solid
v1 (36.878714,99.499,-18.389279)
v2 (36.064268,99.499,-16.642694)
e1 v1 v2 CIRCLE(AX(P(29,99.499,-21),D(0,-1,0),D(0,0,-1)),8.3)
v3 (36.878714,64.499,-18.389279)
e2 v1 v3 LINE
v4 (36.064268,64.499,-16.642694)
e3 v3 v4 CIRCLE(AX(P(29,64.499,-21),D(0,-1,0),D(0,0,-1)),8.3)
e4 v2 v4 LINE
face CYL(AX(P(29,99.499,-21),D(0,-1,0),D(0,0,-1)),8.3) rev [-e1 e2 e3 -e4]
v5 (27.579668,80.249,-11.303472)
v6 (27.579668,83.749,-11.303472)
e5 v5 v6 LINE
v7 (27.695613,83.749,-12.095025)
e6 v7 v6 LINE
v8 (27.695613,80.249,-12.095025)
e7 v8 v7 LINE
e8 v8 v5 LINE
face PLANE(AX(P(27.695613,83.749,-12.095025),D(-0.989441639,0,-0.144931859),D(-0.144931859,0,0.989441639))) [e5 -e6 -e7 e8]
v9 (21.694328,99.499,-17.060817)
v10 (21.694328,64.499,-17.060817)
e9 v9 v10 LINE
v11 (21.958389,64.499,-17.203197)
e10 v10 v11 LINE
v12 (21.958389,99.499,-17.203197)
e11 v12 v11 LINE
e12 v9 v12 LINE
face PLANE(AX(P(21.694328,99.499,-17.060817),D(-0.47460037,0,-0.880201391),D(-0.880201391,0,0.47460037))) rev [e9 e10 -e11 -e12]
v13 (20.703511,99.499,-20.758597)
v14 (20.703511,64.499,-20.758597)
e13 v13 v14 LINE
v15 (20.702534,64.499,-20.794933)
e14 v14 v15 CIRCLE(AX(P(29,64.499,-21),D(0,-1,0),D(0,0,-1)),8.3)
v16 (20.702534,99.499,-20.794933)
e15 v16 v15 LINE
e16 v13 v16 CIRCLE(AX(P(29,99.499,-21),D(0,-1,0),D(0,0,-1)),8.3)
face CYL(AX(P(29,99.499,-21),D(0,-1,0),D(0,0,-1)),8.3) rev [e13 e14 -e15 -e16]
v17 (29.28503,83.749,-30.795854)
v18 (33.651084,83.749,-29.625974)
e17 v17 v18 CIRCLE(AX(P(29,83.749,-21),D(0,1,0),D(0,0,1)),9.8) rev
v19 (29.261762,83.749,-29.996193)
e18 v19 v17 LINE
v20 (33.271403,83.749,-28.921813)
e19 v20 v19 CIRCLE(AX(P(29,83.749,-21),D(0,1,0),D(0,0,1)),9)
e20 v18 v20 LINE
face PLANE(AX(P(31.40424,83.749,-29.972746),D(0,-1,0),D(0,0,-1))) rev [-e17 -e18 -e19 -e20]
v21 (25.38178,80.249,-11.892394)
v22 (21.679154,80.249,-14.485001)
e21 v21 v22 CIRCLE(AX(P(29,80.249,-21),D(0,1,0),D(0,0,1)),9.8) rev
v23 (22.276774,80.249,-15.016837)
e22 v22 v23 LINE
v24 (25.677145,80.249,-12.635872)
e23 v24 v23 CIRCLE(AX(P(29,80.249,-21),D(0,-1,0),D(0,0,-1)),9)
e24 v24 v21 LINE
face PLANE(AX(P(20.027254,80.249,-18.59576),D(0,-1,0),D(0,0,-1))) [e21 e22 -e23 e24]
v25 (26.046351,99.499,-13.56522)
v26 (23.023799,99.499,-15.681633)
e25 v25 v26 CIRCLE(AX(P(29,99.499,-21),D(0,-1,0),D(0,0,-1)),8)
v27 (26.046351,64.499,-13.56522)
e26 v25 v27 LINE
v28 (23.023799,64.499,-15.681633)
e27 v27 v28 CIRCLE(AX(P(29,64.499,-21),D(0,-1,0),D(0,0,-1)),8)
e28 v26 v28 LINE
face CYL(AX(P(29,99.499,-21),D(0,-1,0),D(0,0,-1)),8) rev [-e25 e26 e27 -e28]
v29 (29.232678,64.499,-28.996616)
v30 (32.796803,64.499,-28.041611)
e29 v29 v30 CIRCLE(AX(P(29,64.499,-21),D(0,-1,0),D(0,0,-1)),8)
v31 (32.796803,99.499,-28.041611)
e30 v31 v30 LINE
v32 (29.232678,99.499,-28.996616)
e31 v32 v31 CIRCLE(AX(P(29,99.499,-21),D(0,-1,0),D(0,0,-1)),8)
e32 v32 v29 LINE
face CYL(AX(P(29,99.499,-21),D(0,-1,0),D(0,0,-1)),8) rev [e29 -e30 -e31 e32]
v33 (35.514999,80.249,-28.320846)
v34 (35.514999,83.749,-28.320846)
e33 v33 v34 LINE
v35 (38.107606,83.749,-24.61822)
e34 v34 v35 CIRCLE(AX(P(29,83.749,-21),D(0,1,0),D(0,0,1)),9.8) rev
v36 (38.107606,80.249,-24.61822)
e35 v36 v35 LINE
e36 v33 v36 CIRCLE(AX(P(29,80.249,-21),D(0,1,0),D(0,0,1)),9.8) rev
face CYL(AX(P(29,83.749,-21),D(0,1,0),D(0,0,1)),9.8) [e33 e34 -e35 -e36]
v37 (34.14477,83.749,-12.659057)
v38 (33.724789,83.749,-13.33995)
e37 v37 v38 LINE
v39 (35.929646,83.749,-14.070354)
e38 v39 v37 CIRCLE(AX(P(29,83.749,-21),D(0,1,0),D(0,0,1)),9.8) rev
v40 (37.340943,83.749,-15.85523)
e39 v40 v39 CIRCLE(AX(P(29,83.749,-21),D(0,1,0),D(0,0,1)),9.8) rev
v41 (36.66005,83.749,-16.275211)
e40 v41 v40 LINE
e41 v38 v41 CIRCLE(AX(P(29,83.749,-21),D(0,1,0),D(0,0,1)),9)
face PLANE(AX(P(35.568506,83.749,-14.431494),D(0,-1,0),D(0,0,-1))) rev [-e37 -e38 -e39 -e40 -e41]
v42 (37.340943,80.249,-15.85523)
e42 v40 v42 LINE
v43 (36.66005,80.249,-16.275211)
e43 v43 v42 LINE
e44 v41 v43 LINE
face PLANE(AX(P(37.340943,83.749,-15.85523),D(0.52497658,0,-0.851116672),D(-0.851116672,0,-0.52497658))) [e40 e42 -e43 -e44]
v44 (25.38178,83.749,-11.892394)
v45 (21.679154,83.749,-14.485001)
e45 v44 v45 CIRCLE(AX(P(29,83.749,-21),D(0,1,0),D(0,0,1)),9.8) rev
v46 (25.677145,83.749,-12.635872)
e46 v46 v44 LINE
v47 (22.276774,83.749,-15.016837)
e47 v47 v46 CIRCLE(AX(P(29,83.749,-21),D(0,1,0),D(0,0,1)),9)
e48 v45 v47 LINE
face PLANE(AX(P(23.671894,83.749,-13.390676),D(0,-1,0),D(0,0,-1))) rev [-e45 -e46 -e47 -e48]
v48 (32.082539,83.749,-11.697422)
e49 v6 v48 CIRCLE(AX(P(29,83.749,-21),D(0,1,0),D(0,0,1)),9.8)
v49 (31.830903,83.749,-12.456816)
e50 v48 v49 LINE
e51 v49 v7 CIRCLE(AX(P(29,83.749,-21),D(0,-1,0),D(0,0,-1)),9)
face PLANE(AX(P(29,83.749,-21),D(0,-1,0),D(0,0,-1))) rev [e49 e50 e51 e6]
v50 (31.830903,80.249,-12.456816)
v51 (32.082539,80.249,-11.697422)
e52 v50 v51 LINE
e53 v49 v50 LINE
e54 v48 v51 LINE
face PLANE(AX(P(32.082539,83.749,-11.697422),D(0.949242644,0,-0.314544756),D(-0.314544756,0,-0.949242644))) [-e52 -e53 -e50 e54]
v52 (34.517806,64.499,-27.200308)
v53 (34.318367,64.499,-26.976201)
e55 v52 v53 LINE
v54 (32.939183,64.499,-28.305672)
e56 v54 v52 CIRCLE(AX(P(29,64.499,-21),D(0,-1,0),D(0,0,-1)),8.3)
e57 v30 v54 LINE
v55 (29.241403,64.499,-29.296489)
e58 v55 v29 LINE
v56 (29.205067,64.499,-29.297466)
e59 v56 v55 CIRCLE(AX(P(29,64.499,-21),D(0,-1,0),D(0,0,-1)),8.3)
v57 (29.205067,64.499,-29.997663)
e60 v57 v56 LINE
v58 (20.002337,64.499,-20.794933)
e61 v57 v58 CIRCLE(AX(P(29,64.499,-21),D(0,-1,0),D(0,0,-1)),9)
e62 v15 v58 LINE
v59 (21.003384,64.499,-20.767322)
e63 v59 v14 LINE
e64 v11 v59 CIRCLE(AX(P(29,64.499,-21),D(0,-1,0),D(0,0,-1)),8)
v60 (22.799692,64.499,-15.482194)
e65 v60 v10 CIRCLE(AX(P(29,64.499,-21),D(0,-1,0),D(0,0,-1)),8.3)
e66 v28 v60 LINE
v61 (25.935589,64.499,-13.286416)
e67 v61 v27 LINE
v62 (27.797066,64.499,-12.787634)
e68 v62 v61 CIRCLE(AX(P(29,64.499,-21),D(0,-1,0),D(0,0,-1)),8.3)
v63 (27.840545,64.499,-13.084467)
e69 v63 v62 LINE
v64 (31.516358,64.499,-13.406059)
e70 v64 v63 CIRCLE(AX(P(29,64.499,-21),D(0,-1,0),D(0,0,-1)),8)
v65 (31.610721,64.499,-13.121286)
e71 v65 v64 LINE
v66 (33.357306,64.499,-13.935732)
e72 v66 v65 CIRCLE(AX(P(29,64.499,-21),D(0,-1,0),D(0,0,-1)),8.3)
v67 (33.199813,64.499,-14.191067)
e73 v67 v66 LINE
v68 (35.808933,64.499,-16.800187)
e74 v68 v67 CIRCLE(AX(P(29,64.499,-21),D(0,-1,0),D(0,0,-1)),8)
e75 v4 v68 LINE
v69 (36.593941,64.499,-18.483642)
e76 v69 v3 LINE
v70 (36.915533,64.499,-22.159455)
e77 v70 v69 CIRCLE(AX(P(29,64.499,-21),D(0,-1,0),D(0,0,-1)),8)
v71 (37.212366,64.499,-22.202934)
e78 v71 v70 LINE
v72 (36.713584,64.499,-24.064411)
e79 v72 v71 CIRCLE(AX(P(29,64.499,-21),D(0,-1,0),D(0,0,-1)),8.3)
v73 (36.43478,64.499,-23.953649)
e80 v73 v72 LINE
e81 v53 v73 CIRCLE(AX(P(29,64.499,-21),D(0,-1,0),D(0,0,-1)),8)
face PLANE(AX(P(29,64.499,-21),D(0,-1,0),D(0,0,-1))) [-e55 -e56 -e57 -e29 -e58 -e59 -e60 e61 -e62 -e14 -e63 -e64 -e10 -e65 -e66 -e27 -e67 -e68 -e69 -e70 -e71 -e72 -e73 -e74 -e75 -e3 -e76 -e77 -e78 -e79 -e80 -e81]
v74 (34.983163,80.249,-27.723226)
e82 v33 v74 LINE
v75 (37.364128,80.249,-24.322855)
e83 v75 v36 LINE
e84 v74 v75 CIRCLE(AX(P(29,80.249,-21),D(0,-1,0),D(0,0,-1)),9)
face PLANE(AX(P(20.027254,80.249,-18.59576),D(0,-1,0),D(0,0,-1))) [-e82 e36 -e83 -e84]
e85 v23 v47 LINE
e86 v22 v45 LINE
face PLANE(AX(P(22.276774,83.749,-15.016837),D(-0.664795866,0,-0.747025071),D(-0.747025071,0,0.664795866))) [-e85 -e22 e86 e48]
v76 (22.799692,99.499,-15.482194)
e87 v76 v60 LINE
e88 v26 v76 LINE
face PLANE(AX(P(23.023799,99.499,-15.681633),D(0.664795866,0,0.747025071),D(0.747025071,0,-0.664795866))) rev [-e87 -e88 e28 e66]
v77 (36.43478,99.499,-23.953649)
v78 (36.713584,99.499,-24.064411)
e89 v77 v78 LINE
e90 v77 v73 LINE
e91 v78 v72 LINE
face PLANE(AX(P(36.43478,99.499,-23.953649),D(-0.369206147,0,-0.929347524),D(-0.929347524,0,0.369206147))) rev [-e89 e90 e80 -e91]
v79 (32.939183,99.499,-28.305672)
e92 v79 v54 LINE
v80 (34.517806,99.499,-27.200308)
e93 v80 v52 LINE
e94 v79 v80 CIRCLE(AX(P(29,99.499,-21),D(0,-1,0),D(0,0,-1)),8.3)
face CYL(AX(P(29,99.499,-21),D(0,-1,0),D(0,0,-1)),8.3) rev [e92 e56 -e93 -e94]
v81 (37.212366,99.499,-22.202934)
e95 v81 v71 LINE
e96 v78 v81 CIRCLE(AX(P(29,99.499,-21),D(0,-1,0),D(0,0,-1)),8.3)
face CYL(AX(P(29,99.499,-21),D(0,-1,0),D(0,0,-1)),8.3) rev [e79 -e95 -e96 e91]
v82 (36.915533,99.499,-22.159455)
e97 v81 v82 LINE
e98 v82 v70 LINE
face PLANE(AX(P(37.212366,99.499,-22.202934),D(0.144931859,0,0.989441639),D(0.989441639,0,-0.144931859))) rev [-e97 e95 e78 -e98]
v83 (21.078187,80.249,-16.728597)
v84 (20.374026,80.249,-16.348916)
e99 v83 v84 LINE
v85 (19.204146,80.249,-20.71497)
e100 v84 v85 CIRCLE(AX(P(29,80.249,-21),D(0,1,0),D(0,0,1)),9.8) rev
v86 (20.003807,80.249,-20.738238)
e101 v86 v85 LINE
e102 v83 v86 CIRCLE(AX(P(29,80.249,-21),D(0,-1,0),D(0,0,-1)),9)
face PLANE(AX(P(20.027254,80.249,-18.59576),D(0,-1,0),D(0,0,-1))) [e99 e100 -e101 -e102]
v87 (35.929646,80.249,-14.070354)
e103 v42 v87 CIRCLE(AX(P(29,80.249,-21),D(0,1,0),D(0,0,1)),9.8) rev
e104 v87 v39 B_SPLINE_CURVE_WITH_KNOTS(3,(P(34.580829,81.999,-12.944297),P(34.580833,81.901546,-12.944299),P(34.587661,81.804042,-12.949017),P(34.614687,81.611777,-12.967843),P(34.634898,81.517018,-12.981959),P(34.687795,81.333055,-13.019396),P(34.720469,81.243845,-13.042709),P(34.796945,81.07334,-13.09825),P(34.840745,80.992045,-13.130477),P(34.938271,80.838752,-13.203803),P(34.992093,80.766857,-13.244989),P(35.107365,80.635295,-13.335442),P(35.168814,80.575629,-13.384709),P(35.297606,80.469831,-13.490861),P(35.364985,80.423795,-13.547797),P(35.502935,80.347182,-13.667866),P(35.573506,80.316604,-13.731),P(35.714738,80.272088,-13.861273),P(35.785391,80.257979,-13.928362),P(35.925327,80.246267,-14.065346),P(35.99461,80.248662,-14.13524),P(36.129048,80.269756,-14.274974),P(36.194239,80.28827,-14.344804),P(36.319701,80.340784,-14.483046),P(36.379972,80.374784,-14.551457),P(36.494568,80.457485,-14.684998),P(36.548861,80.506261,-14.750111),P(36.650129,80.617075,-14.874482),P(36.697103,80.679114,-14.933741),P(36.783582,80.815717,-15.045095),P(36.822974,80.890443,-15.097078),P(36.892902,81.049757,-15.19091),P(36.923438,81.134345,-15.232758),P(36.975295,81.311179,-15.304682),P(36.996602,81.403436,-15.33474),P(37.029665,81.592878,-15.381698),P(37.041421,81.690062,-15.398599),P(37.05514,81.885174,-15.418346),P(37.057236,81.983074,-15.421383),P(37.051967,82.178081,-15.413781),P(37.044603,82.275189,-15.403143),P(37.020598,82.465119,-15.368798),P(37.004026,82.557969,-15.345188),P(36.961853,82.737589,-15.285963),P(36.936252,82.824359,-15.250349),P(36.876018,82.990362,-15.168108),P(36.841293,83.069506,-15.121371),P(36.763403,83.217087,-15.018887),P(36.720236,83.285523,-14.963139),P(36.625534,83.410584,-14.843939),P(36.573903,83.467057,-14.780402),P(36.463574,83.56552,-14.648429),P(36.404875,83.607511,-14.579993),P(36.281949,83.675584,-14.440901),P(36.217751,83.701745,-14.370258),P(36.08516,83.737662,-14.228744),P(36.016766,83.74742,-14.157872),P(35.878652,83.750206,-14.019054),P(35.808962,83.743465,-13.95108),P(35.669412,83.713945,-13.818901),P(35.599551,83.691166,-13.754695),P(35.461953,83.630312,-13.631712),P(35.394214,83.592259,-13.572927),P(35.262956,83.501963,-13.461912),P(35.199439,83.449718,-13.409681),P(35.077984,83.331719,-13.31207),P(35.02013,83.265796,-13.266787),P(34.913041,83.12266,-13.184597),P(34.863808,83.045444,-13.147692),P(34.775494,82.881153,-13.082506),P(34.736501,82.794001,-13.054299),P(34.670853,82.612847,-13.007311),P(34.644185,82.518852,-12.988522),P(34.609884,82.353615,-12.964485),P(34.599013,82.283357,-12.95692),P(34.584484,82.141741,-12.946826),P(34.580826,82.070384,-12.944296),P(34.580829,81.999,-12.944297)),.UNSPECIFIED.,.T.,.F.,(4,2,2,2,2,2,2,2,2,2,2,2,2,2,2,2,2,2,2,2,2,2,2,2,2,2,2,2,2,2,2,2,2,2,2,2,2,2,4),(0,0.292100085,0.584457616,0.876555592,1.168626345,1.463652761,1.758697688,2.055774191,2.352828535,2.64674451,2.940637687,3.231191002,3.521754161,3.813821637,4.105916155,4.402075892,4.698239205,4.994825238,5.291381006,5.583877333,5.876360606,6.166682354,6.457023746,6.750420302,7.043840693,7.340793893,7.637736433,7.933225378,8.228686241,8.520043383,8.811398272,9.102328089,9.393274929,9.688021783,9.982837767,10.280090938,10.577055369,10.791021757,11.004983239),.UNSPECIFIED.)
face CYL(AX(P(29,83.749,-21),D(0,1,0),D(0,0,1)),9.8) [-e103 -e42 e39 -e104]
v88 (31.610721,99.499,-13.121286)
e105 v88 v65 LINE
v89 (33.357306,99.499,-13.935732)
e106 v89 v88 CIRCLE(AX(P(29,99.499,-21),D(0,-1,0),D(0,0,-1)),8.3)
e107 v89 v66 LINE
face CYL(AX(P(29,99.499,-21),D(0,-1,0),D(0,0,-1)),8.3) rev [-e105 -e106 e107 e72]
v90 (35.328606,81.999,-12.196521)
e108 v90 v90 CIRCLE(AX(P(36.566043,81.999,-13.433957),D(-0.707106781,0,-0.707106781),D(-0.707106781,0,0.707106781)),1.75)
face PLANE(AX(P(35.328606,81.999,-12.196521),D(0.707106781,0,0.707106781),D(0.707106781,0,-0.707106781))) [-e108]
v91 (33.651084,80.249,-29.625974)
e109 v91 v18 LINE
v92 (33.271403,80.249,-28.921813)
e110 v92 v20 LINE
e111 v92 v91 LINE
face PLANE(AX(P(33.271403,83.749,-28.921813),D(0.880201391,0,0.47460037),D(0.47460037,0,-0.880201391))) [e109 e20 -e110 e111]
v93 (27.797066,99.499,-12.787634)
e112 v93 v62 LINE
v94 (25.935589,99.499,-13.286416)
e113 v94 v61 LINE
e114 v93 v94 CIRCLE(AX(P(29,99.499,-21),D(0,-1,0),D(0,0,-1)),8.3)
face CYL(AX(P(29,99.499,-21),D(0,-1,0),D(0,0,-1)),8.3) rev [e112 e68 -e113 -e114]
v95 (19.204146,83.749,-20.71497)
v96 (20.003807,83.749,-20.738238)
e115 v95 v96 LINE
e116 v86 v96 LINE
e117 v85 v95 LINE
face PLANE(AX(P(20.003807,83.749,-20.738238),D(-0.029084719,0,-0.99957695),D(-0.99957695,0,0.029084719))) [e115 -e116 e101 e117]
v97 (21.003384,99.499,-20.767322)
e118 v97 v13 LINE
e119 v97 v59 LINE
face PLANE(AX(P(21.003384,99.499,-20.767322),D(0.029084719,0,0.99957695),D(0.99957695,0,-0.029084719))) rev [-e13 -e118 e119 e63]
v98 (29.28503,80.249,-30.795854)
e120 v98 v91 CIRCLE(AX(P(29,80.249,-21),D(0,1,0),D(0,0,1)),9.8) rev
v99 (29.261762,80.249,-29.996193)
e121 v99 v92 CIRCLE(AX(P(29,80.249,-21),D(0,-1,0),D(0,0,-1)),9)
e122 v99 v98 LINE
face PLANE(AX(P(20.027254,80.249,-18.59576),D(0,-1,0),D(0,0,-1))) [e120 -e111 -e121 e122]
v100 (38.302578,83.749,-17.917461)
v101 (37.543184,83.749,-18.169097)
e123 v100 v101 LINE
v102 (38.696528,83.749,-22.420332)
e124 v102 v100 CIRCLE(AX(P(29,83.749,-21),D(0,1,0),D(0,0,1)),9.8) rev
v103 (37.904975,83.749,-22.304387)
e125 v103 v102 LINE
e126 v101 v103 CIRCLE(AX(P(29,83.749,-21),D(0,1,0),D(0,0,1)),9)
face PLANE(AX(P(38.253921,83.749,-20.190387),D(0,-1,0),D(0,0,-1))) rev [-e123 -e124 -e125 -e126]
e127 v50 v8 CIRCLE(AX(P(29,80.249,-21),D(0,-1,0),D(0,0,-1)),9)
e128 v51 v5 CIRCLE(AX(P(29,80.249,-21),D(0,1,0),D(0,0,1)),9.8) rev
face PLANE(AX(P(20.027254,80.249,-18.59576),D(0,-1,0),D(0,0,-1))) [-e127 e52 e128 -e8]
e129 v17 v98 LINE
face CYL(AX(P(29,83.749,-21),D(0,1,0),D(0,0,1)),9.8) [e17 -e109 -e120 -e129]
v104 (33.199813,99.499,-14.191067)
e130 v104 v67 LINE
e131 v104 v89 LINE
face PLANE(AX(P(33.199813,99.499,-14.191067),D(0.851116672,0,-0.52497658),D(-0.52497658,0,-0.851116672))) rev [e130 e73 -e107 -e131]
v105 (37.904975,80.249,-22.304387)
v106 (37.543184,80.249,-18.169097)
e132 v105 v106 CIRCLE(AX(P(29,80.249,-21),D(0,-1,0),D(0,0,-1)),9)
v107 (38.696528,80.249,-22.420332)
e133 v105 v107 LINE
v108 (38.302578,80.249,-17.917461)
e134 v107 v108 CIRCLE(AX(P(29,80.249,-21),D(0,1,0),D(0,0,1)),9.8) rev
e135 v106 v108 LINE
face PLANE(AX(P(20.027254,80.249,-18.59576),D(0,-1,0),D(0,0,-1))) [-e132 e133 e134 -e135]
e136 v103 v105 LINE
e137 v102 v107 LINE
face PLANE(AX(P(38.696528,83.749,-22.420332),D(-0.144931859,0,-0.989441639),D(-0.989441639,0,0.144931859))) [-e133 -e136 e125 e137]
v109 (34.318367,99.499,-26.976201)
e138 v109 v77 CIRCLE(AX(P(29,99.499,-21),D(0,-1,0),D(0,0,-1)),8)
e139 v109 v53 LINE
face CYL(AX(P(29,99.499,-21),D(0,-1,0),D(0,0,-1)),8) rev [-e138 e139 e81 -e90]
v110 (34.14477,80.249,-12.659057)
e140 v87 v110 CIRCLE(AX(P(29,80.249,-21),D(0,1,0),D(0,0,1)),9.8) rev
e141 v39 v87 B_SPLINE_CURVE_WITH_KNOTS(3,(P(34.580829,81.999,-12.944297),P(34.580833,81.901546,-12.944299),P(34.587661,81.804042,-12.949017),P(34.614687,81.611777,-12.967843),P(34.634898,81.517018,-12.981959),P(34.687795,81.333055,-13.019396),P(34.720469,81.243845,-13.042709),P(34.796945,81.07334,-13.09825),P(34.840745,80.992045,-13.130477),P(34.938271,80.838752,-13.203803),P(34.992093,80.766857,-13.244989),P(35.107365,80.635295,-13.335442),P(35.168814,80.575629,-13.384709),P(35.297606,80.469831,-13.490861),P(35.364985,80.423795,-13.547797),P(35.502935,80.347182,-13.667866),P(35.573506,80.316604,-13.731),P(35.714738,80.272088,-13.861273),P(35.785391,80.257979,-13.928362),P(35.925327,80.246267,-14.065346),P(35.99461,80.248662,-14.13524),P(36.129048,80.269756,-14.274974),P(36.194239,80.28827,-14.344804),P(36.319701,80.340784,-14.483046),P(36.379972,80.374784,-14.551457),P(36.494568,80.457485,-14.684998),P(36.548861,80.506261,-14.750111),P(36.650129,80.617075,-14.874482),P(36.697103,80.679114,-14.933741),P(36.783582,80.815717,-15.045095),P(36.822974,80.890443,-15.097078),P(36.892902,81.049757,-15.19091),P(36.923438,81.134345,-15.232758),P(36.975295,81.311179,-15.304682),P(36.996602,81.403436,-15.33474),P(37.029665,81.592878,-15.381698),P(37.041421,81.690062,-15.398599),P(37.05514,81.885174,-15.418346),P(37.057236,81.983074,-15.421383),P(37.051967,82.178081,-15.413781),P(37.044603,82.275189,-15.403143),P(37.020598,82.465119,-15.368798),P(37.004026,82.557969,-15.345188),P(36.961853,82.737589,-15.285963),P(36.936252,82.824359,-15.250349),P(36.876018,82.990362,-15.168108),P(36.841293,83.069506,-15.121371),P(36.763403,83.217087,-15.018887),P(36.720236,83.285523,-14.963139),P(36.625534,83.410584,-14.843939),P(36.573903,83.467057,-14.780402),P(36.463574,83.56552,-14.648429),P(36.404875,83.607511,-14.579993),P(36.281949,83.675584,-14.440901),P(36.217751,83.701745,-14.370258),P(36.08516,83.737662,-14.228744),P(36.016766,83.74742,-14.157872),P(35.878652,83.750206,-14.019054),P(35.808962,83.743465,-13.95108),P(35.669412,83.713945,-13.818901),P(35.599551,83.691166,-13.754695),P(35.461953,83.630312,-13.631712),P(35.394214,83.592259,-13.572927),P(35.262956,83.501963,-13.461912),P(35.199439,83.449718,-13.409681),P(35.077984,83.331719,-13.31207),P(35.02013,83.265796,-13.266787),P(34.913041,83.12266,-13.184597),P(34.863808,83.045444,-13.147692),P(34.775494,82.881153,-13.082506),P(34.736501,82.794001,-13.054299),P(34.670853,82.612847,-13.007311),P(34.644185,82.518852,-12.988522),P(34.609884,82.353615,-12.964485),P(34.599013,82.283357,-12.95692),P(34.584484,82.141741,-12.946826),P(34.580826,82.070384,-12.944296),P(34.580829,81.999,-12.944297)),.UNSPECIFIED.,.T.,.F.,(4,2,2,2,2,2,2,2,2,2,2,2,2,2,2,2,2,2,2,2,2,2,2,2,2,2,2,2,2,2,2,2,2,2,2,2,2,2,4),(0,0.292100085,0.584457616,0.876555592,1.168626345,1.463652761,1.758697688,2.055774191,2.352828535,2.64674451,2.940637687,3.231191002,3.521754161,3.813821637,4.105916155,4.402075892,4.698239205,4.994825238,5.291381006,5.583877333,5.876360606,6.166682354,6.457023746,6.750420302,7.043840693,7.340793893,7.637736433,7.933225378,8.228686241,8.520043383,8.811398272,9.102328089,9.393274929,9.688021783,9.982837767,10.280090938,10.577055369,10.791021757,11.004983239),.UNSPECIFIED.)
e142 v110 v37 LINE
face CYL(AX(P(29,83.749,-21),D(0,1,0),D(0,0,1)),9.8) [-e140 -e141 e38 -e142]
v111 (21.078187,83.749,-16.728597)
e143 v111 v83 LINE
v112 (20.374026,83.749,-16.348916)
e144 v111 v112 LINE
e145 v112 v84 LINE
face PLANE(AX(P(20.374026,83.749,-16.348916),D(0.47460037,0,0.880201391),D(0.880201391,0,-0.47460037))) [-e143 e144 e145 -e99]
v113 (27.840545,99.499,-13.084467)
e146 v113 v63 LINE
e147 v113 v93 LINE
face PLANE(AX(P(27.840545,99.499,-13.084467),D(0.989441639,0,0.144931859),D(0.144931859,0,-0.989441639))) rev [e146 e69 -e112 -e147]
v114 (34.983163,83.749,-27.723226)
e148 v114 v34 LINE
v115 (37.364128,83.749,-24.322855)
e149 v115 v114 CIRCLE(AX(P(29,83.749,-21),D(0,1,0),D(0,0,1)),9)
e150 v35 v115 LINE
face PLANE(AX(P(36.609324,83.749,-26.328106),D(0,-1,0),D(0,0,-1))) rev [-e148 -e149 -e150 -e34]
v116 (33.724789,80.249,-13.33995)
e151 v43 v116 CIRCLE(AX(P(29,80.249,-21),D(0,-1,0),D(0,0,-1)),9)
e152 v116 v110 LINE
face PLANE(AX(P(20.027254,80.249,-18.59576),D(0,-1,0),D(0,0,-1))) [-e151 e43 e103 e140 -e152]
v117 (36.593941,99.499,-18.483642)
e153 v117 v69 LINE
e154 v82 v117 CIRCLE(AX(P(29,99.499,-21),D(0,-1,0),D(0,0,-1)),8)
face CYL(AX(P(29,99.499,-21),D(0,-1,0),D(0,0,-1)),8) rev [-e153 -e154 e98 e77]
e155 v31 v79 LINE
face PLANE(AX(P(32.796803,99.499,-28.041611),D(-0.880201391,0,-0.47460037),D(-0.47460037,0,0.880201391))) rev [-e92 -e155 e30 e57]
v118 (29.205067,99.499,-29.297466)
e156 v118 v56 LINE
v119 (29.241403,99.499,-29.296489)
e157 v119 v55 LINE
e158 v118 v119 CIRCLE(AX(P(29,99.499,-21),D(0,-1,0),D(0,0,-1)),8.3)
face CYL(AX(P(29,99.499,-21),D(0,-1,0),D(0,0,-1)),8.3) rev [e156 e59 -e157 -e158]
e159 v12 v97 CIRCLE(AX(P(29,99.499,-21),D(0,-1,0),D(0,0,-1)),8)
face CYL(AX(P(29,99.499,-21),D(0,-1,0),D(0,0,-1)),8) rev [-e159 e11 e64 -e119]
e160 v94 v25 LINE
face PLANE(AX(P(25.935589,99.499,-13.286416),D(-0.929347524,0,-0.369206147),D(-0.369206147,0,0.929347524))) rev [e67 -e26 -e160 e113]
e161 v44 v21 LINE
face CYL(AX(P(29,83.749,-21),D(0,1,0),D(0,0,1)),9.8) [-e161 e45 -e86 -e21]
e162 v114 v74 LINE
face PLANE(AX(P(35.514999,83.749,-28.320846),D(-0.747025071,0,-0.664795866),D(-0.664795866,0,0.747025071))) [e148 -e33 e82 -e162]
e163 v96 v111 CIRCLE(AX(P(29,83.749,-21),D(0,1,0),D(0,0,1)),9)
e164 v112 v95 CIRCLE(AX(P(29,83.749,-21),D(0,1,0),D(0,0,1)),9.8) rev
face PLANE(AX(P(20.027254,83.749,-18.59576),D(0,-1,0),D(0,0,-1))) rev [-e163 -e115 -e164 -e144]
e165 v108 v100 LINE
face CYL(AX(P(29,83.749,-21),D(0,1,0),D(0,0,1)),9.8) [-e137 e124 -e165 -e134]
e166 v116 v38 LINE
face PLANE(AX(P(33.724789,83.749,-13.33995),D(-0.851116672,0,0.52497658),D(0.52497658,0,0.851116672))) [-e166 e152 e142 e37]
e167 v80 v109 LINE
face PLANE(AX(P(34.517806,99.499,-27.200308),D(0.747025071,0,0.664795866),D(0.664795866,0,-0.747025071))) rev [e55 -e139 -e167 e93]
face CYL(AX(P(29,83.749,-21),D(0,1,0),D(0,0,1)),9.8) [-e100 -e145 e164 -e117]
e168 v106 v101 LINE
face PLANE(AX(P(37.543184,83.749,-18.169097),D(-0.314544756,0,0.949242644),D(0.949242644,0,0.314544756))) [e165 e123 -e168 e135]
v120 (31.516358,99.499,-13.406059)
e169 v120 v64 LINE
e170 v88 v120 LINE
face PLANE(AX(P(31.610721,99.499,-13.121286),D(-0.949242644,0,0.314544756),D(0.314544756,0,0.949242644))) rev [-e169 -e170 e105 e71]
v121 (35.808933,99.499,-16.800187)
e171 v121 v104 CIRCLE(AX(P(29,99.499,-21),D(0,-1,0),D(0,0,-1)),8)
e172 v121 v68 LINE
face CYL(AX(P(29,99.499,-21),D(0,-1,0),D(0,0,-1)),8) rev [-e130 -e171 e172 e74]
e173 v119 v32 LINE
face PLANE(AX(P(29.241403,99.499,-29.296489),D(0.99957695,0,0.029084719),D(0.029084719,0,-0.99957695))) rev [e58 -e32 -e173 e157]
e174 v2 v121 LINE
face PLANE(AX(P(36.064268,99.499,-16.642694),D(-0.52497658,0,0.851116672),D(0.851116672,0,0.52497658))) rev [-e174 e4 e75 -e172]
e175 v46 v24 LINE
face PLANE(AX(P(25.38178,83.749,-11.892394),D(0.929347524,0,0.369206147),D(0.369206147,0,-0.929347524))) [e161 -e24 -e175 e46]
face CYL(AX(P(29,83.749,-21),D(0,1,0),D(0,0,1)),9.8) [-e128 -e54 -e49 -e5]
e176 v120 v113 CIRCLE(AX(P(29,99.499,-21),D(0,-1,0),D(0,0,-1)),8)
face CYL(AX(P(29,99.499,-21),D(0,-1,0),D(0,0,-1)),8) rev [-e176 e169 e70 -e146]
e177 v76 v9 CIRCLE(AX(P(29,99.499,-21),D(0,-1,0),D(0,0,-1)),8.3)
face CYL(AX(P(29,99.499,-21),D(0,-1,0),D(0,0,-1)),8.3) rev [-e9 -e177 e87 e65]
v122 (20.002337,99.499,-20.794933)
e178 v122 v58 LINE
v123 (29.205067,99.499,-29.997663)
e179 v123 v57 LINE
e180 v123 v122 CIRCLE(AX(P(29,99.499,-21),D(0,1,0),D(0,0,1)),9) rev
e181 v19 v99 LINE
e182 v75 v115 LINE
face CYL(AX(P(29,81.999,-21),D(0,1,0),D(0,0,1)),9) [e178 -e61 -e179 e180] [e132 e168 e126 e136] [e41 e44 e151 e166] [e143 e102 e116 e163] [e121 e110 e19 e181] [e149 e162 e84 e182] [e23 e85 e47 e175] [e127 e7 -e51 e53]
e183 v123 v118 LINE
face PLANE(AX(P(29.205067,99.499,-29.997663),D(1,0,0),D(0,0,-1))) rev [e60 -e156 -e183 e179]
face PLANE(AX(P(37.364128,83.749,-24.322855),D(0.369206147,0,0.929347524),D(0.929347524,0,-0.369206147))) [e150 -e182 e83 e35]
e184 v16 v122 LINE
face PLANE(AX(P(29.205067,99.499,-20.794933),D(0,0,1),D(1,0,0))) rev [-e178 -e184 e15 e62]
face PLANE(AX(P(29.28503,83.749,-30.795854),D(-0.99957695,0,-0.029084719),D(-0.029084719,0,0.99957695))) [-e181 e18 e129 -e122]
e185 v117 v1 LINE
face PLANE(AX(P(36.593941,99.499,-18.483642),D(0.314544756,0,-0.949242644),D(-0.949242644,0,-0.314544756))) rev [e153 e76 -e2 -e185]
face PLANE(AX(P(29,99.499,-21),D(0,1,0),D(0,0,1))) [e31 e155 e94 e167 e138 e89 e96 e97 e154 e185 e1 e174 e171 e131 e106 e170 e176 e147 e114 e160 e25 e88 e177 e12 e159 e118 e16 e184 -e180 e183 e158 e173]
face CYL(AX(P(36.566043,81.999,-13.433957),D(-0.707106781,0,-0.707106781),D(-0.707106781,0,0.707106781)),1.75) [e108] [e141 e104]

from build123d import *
from build123d.topology import SkipClean

# Parameters (mm, degrees)
CUT_EXTRUDE1_START     = -19.25
CUT_EXTRUDE1_OUTLINE_R = 9
CUT_EXTRUDE1_DEPTH     = 19.25
CUT_EXTRUDE1_2_DEPTH   = 3.5
BOSS_EXTRUDE1_START    = 15.75
SKETCH2_R              = 9
BOSS_EXTRUDE1_DEPTH    = 15.75
CUT_EXTRUDE2_DEPTH     = 61.653315082
CUT_EXTRUDE3_DEPTH     = 61.653315082
CUT_EXTRUDE4_DEPTH     = 61.653315082
CUT_EXTRUDE5_DEPTH     = 35
CUT_EXTRUDE6_DEPTH     = 35
CUT_EXTRUDE7_DEPTH     = 35
CUT_EXTRUDE8_DEPTH     = 35
CUT_EXTRUDE9_DEPTH     = 35
CUT_EXTRUDE10_DEPTH    = 61.653315082
CUT_EXTRUDE11_DEPTH    = 61.653315082


with BuildPart() as part:
    # Cut-Extrude1: read off the stored shape, not the designer's step
    # Cut-Extrude1 outline → Cut-Extrude1 (new body)
    with BuildSketch(Plane(origin=(0, 99.499, 0), x_dir=(-1, 0, 0), z_dir=(0, 1, 0)).offset(CUT_EXTRUDE1_START)):
        with Locations((-29, -21)):
            Circle(CUT_EXTRUDE1_OUTLINE_R)
    extrude(amount=CUT_EXTRUDE1_DEPTH)

    # Cut-Extrude1 2 outline → Cut-Extrude1 2 (add)
    with BuildSketch(Plane(origin=(0, 99.499, 0), x_dir=(-1, 0, 0), z_dir=(0, 1, 0)).offset(CUT_EXTRUDE1_START)):
        with BuildLine():
            ThreePointArc((-21.078187479, -16.728596672), (-20.306667563, -18.670628594), (-20.003807449, -20.738237531))
            Line((-20.003807449, -20.738237531), (-19.204145889, -20.714969756))
            ThreePointArc((-19.204145889, -20.714969756), (-19.533926902, -18.463573358), (-20.374026366, -16.348916376))
            Line((-20.374026366, -16.348916376), (-21.078187479, -16.728596672))
        make_face()
        with BuildLine():
            Line((-29.285030244, -30.795854111), (-29.261762469, -29.996192551))
            ThreePointArc((-29.261762469, -29.996192551), (-31.329371406, -29.693332437), (-33.271403328, -28.921812521))
            Line((-33.271403328, -28.921812521), (-33.651083624, -29.625973634))
            ThreePointArc((-33.651083624, -29.625973634), (-31.536426642, -30.466073098), (-29.285030244, -30.795854111))
        make_face()
        with BuildLine():
            ThreePointArc((-25.677144674, -12.635872282), (-23.837812073, -13.627631601), (-22.276774359, -15.016837209))
            Line((-22.276774359, -15.016837209), (-21.679154302, -14.485000517))
            ThreePointArc((-21.679154302, -14.485000517), (-23.378950924, -12.972309966), (-25.381779756, -11.892394263))
            Line((-25.381779756, -11.892394263), (-25.677144674, -12.635872282))
        make_face()
        with BuildLine():
            Line((-35.514999483, -28.320845698), (-34.983162791, -27.723225641))
            ThreePointArc((-34.983162791, -27.723225641), (-36.372368399, -26.162187927), (-37.364127718, -24.322855326))
            Line((-37.364127718, -24.322855326), (-38.107605737, -24.618220244))
            ThreePointArc((-38.107605737, -24.618220244), (-37.027690034, -26.621049076), (-35.514999483, -28.320845698))
        make_face()
        with BuildLine():
            ThreePointArc((-31.830902805, -12.456816208), (-29.784401684, -12.034247717), (-27.695613266, -12.095025253))
            Line((-27.695613266, -12.095025253), (-27.579667779, -11.303471942))
            ThreePointArc((-27.579667779, -11.303471942), (-29.854126279, -11.237291959), (-32.08253861, -11.697422093))
            Line((-32.08253861, -11.697422093), (-31.830902805, -12.456816208))
        make_face()
        with BuildLine():
            Line((-38.696528058, -22.420332221), (-37.904974747, -22.304386734))
            ThreePointArc((-37.904974747, -22.304386734), (-37.965752283, -20.215598316), (-37.543183792, -18.169097195))
            Line((-37.543183792, -18.169097195), (-38.302577907, -17.91746139))
            ThreePointArc((-38.302577907, -17.91746139), (-38.762708041, -20.145873721), (-38.696528058, -22.420332221))
        make_face()
        with BuildLine():
            ThreePointArc((-36.660050052, -16.275210777), (-35.363961031, -14.636038969), (-33.724789223, -13.339949948))
            Line((-33.724789223, -13.339949948), (-34.144770487, -12.65905661))
            ThreePointArc((-34.144770487, -12.65905661), (-35.929646456, -14.070353544), (-37.34094339, -15.855229513))
            Line((-37.34094339, -15.855229513), (-36.660050052, -16.275210777))
        make_face()
    extrude(amount=CUT_EXTRUDE1_2_DEPTH)

    # Sketch2 → Boss-Extrude1 (add)
    with SkipClean():  # the faces are left unmerged after this step: merging them gives an invalid solid
        with BuildSketch(Plane.XZ.offset(-80.249).offset(BOSS_EXTRUDE1_START)):
            with Locations(Location((29, -21, 0), (0, 0, 90))):
                Circle(SKETCH2_R)
        extrude(amount=-BOSS_EXTRUDE1_DEPTH)

    # Sketch3 → Cut-Extrude2 (cut, through all)
    with SkipClean():  # the faces are left unmerged after this step: merging them gives an invalid solid
        with BuildSketch(Plane.XZ.offset(-64.499)):
            with BuildLine():
                Line((29.205067383, -29.997663439), (29.205067383, -20.794932617))
                Line((29.205067383, -20.794932617), (20.002336561, -20.794932617))
                ThreePointArc((20.002336561, -20.794932617), (22.636038969, -27.363961031), (29.205067383, -29.997663439))
            make_face()
        extrude(amount=-CUT_EXTRUDE2_DEPTH, mode=Mode.SUBTRACT)

    # Sketch4 → Cut-Extrude3 (cut, through all)
    with SkipClean():  # the faces are left unmerged after this step: merging them gives an invalid solid
        with BuildSketch(Plane.XZ.offset(-64.499)):
            with BuildLine():
                Line((29.205067383, -20.794932617), (29.205067383, -28.997371279))
                ThreePointArc((29.205067383, -28.997371279), (34.656854249, -15.343145751), (21.002628721, -20.794932617))
                Line((21.002628721, -20.794932617), (29.205067383, -20.794932617))
            make_face()
        extrude(amount=-CUT_EXTRUDE3_DEPTH, mode=Mode.SUBTRACT)

    # Sketch5 → Cut-Extrude4 (cut, through all)
    with SkipClean():  # the faces are left unmerged after this step: merging them gives an invalid solid
        with BuildSketch(Plane.XZ.offset(-64.499)):
            with BuildLine():
                Line((32.796802958, -28.041611129), (32.939183069, -28.305671547))
                ThreePointArc((32.939183069, -28.305671547), (33.760684422, -27.798961968), (34.517805685, -27.200308091))
                Line((34.517805685, -27.200308091), (34.318366925, -26.97620057))
                ThreePointArc((34.318366925, -26.97620057), (33.588611491, -27.553216354), (32.796802958, -28.041611129))
            make_face()
        extrude(amount=-CUT_EXTRUDE4_DEPTH, mode=Mode.SUBTRACT)

    # Sketch6 → Cut-Extrude5 (cut)
    with SkipClean():  # the faces are left unmerged after this step: merging them gives an invalid solid
        with BuildSketch(Plane.XZ.offset(-64.499)):
            with BuildLine():
                Line((36.434780194, -23.953649179), (36.713584451, -24.064411023))
                ThreePointArc((36.713584451, -24.064411023), (37.017184358, -23.148198074), (37.2123656, -22.202934432))
                Line((37.2123656, -22.202934432), (36.915533109, -22.159454874))
                ThreePointArc((36.915533109, -22.159454874), (36.72740661, -23.070552361), (36.434780194, -23.953649179))
            make_face()
        extrude(amount=-CUT_EXTRUDE5_DEPTH, mode=Mode.SUBTRACT)

    # Sketch7 → Cut-Extrude6 (cut)
    with SkipClean():  # the faces are left unmerged after this step: merging them gives an invalid solid
        with BuildSketch(Plane.XZ.offset(-64.499)):
            with BuildLine():
                Line((36.593941149, -18.483641951), (36.878713942, -18.389278524))
                ThreePointArc((36.878713942, -18.389278524), (36.522354632, -17.492268428), (36.064268381, -16.642694383))
                Line((36.064268381, -16.642694383), (35.808933379, -16.800187357))
                ThreePointArc((35.808933379, -16.800187357), (36.250462296, -17.619053906), (36.593941149, -18.483641951))
            make_face()
        extrude(amount=-CUT_EXTRUDE6_DEPTH, mode=Mode.SUBTRACT)

    # Sketch8 → Cut-Extrude7 (cut)
    with SkipClean():  # the faces are left unmerged after this step: merging them gives an invalid solid
        with BuildSketch(Plane.XZ.offset(-64.499)):
            with BuildLine():
                Line((33.199812643, -14.191066621), (33.357305617, -13.935731619))
                ThreePointArc((33.357305617, -13.935731619), (32.507731572, -13.477645368), (31.610721476, -13.121286058))
                Line((31.610721476, -13.121286058), (31.516358049, -13.406058851))
                ThreePointArc((31.516358049, -13.406058851), (32.380946094, -13.749537704), (33.199812643, -14.191066621))
            make_face()
        extrude(amount=-CUT_EXTRUDE7_DEPTH, mode=Mode.SUBTRACT)

    # Sketch9 → Cut-Extrude8 (cut)
    with SkipClean():  # the faces are left unmerged after this step: merging them gives an invalid solid
        with BuildSketch(Plane.XZ.offset(-64.499)):
            with BuildLine():
                Line((27.840545126, -13.084466891), (27.797065568, -12.7876344))
                ThreePointArc((27.797065568, -12.7876344), (26.851801926, -12.982815642), (25.935588977, -13.286415549))
                Line((25.935588977, -13.286415549), (26.046350821, -13.565219806))
                ThreePointArc((26.046350821, -13.565219806), (26.929447639, -13.27259339), (27.840545126, -13.084466891))
            make_face()
        extrude(amount=-CUT_EXTRUDE8_DEPTH, mode=Mode.SUBTRACT)

    # Sketch10 → Cut-Extrude9 (cut)
    with SkipClean():  # the faces are left unmerged after this step: merging them gives an invalid solid
        with BuildSketch(Plane.XZ.offset(-64.499)):
            with BuildLine():
                Line((23.02379943, -15.681633075), (22.799691909, -15.482194315))
                ThreePointArc((22.799691909, -15.482194315), (22.201038032, -16.239315578), (21.694328453, -17.060816931))
                Line((21.694328453, -17.060816931), (21.958388871, -17.203197042))
                ThreePointArc((21.958388871, -17.203197042), (22.446783646, -16.411388509), (23.02379943, -15.681633075))
            make_face()
        extrude(amount=-CUT_EXTRUDE9_DEPTH, mode=Mode.SUBTRACT)

    # Sketch11 → Cut-Extrude10 (cut, through all)
    with SkipClean():  # the faces are left unmerged after this step: merging them gives an invalid solid
        with BuildSketch(Plane.XZ.offset(-64.499)):
            with BuildLine():
                Line((21.003384399, -20.76732225), (20.703511314, -20.758596834))
                ThreePointArc((20.703511314, -20.758596834), (20.703002605, -20.77676419), (20.702533678, -20.794932617))
                Line((20.702533678, -20.794932617), (21.002628721, -20.794932617))
                ThreePointArc((21.002628721, -20.794932617), (21.002994644, -20.781127107), (21.003384399, -20.76732225))
            make_face()
        extrude(amount=-CUT_EXTRUDE10_DEPTH, mode=Mode.SUBTRACT)

    # Sketch12 → Cut-Extrude11 (cut, through all)
    with SkipClean():  # the faces are left unmerged after this step: merging them gives an invalid solid
        with BuildSketch(Plane.XZ.offset(-64.499)):
            with BuildLine():
                Line((29.241403166, -29.296488686), (29.23267775, -28.996615601))
                ThreePointArc((29.23267775, -28.996615601), (29.218872893, -28.997005356), (29.205067383, -28.997371279))
                Line((29.205067383, -28.997371279), (29.205067383, -29.297466322))
                ThreePointArc((29.205067383, -29.297466322), (29.22323581, -29.296997395), (29.241403166, -29.296488686))
            make_face()
        extrude(amount=-CUT_EXTRUDE11_DEPTH, mode=Mode.SUBTRACT)

    # Sketch13 → Revolve1 (revolve)
    with SkipClean():  # the faces are left unmerged after this step: merging them gives an invalid solid
        with BuildSketch(Plane(origin=(0, 81.999, 0), x_dir=(1, 0, 0), z_dir=(0, 1, 0))):
            Polygon((35.818265909, 14.181734091), (34.580829041, 12.944297224), (35.328605692, 12.196520574), (36.566042559, 13.433957441), align=None)
        revolve(axis=Axis((36.566042559, 81.999, -13.433957441), (-0.7071067811865508, 0, -0.7071067811865442)))


solid = part.part
